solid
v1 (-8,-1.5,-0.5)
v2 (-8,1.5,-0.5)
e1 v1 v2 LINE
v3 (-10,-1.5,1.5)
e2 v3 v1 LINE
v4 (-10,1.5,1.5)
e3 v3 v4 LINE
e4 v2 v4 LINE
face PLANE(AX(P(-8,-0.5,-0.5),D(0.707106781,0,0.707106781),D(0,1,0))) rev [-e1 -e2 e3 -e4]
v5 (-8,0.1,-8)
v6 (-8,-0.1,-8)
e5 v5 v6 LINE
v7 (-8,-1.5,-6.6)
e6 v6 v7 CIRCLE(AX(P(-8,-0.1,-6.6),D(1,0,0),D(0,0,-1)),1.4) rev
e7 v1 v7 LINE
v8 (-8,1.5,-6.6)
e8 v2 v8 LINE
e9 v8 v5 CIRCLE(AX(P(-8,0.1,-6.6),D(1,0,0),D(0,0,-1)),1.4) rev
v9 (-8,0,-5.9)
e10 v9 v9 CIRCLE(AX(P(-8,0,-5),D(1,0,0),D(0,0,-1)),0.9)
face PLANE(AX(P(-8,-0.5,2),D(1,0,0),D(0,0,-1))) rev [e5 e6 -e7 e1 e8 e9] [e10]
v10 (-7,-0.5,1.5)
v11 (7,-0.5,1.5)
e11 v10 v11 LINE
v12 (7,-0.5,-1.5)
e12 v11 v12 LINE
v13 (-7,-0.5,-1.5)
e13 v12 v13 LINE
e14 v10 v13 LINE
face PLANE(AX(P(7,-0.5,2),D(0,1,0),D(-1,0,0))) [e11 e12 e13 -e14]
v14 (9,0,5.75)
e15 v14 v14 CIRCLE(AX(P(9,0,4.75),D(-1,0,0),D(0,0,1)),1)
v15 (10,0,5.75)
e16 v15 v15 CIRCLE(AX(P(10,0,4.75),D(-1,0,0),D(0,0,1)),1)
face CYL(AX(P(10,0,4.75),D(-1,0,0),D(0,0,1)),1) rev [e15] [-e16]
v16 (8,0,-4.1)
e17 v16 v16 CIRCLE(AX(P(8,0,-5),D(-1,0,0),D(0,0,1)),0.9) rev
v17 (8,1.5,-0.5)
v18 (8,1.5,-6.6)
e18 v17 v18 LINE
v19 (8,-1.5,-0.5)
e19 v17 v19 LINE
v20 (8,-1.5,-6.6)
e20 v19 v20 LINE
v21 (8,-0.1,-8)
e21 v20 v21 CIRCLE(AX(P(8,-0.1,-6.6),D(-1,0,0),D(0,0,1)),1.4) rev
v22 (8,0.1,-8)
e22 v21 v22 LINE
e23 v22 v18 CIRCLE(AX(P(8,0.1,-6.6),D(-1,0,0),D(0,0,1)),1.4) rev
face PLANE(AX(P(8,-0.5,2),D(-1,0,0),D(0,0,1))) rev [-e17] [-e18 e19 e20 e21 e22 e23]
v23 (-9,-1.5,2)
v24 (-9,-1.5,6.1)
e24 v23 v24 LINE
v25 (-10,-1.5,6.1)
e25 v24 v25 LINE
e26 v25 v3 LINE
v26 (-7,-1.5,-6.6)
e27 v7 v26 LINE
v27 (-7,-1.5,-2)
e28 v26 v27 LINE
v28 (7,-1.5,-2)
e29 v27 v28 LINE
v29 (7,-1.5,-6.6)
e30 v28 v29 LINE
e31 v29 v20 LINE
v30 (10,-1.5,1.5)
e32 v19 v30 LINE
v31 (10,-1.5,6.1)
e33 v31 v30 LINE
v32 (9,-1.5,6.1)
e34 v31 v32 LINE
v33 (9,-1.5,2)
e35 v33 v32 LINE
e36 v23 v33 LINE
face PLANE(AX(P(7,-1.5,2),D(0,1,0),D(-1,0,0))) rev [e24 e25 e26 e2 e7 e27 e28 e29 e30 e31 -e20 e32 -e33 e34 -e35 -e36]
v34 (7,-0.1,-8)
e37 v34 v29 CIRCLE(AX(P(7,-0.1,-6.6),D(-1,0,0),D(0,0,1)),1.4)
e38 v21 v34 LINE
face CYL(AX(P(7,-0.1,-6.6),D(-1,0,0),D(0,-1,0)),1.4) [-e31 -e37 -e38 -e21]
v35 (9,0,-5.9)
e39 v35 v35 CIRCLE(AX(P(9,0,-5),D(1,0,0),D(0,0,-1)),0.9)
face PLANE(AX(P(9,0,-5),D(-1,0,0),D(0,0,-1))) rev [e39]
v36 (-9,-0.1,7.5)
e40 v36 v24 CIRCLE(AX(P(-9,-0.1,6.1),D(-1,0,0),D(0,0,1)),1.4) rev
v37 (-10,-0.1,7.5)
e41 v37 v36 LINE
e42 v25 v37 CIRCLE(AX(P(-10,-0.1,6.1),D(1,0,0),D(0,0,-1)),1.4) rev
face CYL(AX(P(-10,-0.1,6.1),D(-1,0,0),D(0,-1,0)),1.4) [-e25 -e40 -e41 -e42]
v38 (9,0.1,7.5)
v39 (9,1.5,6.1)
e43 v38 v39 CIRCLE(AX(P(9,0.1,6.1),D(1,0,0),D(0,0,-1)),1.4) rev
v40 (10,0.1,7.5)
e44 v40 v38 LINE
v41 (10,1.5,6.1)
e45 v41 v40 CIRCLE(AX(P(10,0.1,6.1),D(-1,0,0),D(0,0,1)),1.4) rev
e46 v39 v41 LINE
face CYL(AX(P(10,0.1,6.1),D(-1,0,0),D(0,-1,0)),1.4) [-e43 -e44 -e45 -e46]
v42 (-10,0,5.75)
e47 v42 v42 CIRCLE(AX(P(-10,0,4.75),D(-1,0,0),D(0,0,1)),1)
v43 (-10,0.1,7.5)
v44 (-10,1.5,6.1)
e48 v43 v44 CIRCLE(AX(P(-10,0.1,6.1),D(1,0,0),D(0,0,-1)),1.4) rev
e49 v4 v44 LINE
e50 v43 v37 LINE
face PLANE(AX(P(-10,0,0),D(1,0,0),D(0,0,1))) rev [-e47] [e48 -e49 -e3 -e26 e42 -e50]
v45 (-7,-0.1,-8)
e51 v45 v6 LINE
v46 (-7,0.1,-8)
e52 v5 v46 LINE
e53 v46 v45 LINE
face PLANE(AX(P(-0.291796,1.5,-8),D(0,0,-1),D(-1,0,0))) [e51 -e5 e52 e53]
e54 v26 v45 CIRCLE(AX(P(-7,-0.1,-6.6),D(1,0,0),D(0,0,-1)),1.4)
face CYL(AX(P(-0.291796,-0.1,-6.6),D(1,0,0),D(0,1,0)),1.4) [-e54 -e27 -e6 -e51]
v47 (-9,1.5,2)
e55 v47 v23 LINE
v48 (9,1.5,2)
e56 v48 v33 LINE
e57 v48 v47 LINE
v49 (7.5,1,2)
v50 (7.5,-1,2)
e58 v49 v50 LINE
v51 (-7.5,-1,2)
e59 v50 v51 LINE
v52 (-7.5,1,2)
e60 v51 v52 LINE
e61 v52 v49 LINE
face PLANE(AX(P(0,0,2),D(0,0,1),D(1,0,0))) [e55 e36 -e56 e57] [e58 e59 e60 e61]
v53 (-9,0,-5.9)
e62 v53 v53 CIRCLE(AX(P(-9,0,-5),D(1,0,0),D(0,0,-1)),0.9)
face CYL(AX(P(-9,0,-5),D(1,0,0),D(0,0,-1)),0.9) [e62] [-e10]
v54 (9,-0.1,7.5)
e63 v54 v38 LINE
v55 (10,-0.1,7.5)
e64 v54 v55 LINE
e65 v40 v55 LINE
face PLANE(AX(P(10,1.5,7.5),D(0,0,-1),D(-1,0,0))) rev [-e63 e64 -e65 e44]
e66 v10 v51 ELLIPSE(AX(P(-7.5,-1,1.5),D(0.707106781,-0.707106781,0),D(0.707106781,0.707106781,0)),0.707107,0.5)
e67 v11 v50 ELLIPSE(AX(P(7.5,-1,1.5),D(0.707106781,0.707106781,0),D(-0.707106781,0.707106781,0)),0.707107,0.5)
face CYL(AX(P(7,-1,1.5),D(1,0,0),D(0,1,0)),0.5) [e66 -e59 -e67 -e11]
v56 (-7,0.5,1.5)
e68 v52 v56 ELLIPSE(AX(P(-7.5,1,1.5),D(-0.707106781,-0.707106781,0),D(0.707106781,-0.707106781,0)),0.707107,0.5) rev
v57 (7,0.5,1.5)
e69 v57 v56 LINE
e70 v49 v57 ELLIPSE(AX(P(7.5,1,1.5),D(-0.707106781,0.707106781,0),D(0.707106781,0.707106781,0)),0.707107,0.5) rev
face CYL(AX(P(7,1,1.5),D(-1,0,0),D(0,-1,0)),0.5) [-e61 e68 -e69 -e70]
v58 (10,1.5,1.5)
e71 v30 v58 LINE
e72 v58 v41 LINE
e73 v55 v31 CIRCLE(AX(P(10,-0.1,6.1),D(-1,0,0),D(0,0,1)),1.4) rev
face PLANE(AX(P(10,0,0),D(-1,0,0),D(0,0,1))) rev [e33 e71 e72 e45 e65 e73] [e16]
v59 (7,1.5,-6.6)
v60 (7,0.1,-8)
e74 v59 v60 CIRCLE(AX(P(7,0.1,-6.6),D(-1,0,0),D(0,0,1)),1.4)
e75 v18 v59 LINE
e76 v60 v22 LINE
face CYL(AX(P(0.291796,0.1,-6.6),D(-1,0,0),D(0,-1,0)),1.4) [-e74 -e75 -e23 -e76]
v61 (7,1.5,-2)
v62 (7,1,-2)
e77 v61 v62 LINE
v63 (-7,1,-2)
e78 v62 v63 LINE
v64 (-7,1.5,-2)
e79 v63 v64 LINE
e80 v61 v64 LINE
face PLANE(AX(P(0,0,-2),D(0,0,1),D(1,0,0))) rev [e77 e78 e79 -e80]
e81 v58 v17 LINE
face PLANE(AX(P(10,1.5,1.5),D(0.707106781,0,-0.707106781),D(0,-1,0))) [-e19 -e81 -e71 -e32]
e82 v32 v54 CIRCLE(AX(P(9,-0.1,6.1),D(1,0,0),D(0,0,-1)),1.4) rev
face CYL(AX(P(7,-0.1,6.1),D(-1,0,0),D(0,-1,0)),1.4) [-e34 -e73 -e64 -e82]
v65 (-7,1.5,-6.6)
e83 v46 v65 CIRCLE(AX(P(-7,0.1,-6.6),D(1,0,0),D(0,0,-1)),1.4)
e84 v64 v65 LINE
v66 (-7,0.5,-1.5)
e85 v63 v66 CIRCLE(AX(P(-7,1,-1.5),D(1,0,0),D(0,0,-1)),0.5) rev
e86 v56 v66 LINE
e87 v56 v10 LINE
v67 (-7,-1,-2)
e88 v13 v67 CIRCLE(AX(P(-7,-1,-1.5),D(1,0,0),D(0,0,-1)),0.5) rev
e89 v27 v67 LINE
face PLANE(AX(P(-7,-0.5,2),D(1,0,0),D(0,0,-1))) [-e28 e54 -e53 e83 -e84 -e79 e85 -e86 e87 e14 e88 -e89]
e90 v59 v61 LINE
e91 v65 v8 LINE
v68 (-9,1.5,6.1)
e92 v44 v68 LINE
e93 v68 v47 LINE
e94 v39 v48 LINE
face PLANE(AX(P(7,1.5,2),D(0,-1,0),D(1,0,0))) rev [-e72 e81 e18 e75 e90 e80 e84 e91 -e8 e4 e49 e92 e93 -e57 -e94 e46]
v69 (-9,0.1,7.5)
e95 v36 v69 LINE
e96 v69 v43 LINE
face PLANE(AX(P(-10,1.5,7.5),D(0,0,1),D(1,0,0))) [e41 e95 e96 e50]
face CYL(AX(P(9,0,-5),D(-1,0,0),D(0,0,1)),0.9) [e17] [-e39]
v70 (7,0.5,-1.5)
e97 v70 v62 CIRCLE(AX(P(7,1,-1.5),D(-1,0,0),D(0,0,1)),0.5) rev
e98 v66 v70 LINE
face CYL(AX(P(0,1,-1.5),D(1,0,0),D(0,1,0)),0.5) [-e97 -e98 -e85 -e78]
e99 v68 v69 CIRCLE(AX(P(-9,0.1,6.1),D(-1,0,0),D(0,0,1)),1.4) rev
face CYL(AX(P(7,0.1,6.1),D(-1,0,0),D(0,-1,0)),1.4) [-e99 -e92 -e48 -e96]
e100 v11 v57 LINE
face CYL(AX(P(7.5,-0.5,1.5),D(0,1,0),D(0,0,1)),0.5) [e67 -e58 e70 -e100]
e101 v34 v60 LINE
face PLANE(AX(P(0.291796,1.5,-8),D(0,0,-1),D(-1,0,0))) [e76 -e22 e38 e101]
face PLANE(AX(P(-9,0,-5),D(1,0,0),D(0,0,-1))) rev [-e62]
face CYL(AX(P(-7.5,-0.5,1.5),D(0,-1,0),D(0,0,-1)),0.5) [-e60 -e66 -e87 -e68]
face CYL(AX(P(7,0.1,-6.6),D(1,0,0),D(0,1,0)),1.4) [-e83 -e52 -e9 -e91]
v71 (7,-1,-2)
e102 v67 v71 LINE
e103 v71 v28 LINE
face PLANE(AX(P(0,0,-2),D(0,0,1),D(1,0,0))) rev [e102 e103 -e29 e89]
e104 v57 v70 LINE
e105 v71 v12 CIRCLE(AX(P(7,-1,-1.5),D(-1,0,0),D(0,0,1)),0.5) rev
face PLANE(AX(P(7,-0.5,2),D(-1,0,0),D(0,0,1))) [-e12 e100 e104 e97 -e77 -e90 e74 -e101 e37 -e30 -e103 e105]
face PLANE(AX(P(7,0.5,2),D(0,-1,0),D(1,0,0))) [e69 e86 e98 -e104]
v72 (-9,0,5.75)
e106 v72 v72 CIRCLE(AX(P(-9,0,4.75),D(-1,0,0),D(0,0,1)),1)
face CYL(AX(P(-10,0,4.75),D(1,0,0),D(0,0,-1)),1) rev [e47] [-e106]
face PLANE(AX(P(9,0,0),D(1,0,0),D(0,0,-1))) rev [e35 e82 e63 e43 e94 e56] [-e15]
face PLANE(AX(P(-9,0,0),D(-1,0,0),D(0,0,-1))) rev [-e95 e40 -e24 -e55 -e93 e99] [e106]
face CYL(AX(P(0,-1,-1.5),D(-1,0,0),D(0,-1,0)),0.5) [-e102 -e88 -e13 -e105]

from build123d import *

# Parameters (mm, degrees)
SKETCH1_W           = 16
SKETCH1_H           = 3
SKETCH1_W_2         = 14
SKETCH1_H_2         = 1
EXTRUDE_THIN1_DEPTH = 2
SKETCH2_W           = 6
SKETCH2_H           = 3
BOSS_EXTRUDE1_DEPTH = 2
CHAMFER3_SIZE       = 2
SKETCH3_W           = 5.5
SKETCH3_H           = 3
CUT_EXTRUDE1_DEPTH  = 1
BOSS_EXTRUDE2_START = -1
SKETCH4_W           = 6
SKETCH4_H           = 3
BOSS_EXTRUDE2_DEPTH = 1
SKETCH5_W           = 6
SKETCH5_H           = 3
BOSS_EXTRUDE3_DEPTH = 1
CHAMFER4_SIZE       = 2
FILLET1_R           = 1.4
SKETCH7_R           = 1
CUT_EXTRUDE3_DEPTH  = 1
SKETCH8_R           = 0.9
BOSS_EXTRUDE5_DEPTH = 2
FILLET4_R           = 0.5
FILLET6_R           = 0.5


with BuildPart() as part:
    # Sketch1 → Extrude-Thin1 (new, symmetric)
    with BuildSketch(Plane.XY):
        Rectangle(SKETCH1_W, SKETCH1_H)
        Rectangle(SKETCH1_W_2, SKETCH1_H_2, mode=Mode.SUBTRACT)
    extrude(amount=EXTRUDE_THIN1_DEPTH, both=True)

    # Sketch2 → Boss-Extrude1 (add)
    with BuildSketch(Plane(origin=(8, 0, 0), x_dir=(0, 0, -1), z_dir=(1, 0, 0))):
        with Locations((-4.5, 0)):
            Rectangle(SKETCH2_W, SKETCH2_H)
    boss_extrude1 = extrude(amount=BOSS_EXTRUDE1_DEPTH)

    # Chamfer3
    chamfer3_edges = [part.edges().sort_by_distance(p)[0] for p in [
        (8, 0, 1.5),
    ]]
    chamfer(chamfer3_edges, length=CHAMFER3_SIZE - 0.0001)  # a hair under: the kernel refuses the full size

    # Sketch3 → Cut-Extrude1 (cut)
    with BuildSketch(Plane.ZY.offset(-8)):
        with Locations((4.75, 0)):
            Rectangle(SKETCH3_W, SKETCH3_H)
    cut_extrude1 = extrude(amount=-CUT_EXTRUDE1_DEPTH, mode=Mode.SUBTRACT)

    # Sketch4 → Boss-Extrude2 (add)
    with BuildSketch(Plane(origin=(8, 0, 0), x_dir=(0, 0, -1), z_dir=(1, 0, 0)).offset(BOSS_EXTRUDE2_START)):
        with Locations((5, 0)):
            Rectangle(SKETCH4_W, SKETCH4_H)
    extrude(amount=BOSS_EXTRUDE2_DEPTH)

    # Mirror2: Boss-Extrude1, Cut-Extrude1 across plane
    add(boss_extrude1.mirror(Plane(origin=(0, 0, 0), x_dir=(0, 0, 1), z_dir=(1, 0, 0))))
    add(cut_extrude1.mirror(Plane(origin=(0, 0, 0), x_dir=(0, 0, 1), z_dir=(1, 0, 0))), mode=Mode.SUBTRACT)

    # Sketch5 → Boss-Extrude3 (add)
    with BuildSketch(Plane.ZY.offset(8)):
        with Locations((-5, 0)):
            Rectangle(SKETCH5_W, SKETCH5_H)
    extrude(amount=-BOSS_EXTRUDE3_DEPTH)

    # Chamfer4
    chamfer4_edges = [part.edges().sort_by_distance(p)[0] for p in [
        (-8, 0, 1.5),
    ]]
    chamfer(chamfer4_edges, length=CHAMFER4_SIZE - 0.0001)  # a hair under: the kernel refuses the full size

    # Fillet1
    fillet1_edges = [part.edges().sort_by_distance(p)[0] for p in [
        (-7.5, 1.5, -8),
        (-7.5, -1.5, -8),
        (9.5, 1.5, 7.5),
        (9.5, -1.5, 7.5),
        (7.5, -1.5, -8),
        (7.5, 1.5, -8),
        (-9.5, -1.5, 7.5),
        (-9.5, 1.5, 7.5),
    ]]
    fillet(fillet1_edges, radius=FILLET1_R)

    # Sketch7 → Cut-Extrude3 (cut)
    with BuildSketch(Plane.ZY.offset(-9)):
        with Locations((4.75, 0)):
            Circle(SKETCH7_R)
    cut_extrude3 = extrude(amount=-CUT_EXTRUDE3_DEPTH, mode=Mode.SUBTRACT)

    # Mirror6: Cut-Extrude3 across plane
    add(cut_extrude3.mirror(Plane(origin=(0, 0, 0), x_dir=(0, 0, 1), z_dir=(1, 0, 0))), mode=Mode.SUBTRACT)

    # Sketch8 → Boss-Extrude5 (add)
    with BuildSketch(Plane(origin=(-7, 0, 0), x_dir=(0, 0, -1), z_dir=(1, 0, 0))):
        with Locations((5, 0)):
            Circle(SKETCH8_R)
    boss_extrude5 = extrude(amount=-BOSS_EXTRUDE5_DEPTH)

    # Mirror7: Boss-Extrude5 across plane
    add(boss_extrude5.mirror(Plane(origin=(0, 0, 0), x_dir=(0, 0, 1), z_dir=(1, 0, 0))))

    # Fillet4
    fillet4_edges = [part.edges().sort_by_distance(p)[0] for p in [
        (0, -0.5, -2),
        (0, 0.5, -2),
    ]]
    fillet(fillet4_edges, radius=FILLET4_R)

    # Fillet6
    fillet6_edges = [part.edges().sort_by_distance(p)[0] for p in [
        (-7, 0, 2),
        (0, -0.5, 2),
        (7, 0, 2),
        (0, 0.5, 2),
    ]]
    fillet(fillet6_edges, radius=FILLET6_R)


solid = part.part
